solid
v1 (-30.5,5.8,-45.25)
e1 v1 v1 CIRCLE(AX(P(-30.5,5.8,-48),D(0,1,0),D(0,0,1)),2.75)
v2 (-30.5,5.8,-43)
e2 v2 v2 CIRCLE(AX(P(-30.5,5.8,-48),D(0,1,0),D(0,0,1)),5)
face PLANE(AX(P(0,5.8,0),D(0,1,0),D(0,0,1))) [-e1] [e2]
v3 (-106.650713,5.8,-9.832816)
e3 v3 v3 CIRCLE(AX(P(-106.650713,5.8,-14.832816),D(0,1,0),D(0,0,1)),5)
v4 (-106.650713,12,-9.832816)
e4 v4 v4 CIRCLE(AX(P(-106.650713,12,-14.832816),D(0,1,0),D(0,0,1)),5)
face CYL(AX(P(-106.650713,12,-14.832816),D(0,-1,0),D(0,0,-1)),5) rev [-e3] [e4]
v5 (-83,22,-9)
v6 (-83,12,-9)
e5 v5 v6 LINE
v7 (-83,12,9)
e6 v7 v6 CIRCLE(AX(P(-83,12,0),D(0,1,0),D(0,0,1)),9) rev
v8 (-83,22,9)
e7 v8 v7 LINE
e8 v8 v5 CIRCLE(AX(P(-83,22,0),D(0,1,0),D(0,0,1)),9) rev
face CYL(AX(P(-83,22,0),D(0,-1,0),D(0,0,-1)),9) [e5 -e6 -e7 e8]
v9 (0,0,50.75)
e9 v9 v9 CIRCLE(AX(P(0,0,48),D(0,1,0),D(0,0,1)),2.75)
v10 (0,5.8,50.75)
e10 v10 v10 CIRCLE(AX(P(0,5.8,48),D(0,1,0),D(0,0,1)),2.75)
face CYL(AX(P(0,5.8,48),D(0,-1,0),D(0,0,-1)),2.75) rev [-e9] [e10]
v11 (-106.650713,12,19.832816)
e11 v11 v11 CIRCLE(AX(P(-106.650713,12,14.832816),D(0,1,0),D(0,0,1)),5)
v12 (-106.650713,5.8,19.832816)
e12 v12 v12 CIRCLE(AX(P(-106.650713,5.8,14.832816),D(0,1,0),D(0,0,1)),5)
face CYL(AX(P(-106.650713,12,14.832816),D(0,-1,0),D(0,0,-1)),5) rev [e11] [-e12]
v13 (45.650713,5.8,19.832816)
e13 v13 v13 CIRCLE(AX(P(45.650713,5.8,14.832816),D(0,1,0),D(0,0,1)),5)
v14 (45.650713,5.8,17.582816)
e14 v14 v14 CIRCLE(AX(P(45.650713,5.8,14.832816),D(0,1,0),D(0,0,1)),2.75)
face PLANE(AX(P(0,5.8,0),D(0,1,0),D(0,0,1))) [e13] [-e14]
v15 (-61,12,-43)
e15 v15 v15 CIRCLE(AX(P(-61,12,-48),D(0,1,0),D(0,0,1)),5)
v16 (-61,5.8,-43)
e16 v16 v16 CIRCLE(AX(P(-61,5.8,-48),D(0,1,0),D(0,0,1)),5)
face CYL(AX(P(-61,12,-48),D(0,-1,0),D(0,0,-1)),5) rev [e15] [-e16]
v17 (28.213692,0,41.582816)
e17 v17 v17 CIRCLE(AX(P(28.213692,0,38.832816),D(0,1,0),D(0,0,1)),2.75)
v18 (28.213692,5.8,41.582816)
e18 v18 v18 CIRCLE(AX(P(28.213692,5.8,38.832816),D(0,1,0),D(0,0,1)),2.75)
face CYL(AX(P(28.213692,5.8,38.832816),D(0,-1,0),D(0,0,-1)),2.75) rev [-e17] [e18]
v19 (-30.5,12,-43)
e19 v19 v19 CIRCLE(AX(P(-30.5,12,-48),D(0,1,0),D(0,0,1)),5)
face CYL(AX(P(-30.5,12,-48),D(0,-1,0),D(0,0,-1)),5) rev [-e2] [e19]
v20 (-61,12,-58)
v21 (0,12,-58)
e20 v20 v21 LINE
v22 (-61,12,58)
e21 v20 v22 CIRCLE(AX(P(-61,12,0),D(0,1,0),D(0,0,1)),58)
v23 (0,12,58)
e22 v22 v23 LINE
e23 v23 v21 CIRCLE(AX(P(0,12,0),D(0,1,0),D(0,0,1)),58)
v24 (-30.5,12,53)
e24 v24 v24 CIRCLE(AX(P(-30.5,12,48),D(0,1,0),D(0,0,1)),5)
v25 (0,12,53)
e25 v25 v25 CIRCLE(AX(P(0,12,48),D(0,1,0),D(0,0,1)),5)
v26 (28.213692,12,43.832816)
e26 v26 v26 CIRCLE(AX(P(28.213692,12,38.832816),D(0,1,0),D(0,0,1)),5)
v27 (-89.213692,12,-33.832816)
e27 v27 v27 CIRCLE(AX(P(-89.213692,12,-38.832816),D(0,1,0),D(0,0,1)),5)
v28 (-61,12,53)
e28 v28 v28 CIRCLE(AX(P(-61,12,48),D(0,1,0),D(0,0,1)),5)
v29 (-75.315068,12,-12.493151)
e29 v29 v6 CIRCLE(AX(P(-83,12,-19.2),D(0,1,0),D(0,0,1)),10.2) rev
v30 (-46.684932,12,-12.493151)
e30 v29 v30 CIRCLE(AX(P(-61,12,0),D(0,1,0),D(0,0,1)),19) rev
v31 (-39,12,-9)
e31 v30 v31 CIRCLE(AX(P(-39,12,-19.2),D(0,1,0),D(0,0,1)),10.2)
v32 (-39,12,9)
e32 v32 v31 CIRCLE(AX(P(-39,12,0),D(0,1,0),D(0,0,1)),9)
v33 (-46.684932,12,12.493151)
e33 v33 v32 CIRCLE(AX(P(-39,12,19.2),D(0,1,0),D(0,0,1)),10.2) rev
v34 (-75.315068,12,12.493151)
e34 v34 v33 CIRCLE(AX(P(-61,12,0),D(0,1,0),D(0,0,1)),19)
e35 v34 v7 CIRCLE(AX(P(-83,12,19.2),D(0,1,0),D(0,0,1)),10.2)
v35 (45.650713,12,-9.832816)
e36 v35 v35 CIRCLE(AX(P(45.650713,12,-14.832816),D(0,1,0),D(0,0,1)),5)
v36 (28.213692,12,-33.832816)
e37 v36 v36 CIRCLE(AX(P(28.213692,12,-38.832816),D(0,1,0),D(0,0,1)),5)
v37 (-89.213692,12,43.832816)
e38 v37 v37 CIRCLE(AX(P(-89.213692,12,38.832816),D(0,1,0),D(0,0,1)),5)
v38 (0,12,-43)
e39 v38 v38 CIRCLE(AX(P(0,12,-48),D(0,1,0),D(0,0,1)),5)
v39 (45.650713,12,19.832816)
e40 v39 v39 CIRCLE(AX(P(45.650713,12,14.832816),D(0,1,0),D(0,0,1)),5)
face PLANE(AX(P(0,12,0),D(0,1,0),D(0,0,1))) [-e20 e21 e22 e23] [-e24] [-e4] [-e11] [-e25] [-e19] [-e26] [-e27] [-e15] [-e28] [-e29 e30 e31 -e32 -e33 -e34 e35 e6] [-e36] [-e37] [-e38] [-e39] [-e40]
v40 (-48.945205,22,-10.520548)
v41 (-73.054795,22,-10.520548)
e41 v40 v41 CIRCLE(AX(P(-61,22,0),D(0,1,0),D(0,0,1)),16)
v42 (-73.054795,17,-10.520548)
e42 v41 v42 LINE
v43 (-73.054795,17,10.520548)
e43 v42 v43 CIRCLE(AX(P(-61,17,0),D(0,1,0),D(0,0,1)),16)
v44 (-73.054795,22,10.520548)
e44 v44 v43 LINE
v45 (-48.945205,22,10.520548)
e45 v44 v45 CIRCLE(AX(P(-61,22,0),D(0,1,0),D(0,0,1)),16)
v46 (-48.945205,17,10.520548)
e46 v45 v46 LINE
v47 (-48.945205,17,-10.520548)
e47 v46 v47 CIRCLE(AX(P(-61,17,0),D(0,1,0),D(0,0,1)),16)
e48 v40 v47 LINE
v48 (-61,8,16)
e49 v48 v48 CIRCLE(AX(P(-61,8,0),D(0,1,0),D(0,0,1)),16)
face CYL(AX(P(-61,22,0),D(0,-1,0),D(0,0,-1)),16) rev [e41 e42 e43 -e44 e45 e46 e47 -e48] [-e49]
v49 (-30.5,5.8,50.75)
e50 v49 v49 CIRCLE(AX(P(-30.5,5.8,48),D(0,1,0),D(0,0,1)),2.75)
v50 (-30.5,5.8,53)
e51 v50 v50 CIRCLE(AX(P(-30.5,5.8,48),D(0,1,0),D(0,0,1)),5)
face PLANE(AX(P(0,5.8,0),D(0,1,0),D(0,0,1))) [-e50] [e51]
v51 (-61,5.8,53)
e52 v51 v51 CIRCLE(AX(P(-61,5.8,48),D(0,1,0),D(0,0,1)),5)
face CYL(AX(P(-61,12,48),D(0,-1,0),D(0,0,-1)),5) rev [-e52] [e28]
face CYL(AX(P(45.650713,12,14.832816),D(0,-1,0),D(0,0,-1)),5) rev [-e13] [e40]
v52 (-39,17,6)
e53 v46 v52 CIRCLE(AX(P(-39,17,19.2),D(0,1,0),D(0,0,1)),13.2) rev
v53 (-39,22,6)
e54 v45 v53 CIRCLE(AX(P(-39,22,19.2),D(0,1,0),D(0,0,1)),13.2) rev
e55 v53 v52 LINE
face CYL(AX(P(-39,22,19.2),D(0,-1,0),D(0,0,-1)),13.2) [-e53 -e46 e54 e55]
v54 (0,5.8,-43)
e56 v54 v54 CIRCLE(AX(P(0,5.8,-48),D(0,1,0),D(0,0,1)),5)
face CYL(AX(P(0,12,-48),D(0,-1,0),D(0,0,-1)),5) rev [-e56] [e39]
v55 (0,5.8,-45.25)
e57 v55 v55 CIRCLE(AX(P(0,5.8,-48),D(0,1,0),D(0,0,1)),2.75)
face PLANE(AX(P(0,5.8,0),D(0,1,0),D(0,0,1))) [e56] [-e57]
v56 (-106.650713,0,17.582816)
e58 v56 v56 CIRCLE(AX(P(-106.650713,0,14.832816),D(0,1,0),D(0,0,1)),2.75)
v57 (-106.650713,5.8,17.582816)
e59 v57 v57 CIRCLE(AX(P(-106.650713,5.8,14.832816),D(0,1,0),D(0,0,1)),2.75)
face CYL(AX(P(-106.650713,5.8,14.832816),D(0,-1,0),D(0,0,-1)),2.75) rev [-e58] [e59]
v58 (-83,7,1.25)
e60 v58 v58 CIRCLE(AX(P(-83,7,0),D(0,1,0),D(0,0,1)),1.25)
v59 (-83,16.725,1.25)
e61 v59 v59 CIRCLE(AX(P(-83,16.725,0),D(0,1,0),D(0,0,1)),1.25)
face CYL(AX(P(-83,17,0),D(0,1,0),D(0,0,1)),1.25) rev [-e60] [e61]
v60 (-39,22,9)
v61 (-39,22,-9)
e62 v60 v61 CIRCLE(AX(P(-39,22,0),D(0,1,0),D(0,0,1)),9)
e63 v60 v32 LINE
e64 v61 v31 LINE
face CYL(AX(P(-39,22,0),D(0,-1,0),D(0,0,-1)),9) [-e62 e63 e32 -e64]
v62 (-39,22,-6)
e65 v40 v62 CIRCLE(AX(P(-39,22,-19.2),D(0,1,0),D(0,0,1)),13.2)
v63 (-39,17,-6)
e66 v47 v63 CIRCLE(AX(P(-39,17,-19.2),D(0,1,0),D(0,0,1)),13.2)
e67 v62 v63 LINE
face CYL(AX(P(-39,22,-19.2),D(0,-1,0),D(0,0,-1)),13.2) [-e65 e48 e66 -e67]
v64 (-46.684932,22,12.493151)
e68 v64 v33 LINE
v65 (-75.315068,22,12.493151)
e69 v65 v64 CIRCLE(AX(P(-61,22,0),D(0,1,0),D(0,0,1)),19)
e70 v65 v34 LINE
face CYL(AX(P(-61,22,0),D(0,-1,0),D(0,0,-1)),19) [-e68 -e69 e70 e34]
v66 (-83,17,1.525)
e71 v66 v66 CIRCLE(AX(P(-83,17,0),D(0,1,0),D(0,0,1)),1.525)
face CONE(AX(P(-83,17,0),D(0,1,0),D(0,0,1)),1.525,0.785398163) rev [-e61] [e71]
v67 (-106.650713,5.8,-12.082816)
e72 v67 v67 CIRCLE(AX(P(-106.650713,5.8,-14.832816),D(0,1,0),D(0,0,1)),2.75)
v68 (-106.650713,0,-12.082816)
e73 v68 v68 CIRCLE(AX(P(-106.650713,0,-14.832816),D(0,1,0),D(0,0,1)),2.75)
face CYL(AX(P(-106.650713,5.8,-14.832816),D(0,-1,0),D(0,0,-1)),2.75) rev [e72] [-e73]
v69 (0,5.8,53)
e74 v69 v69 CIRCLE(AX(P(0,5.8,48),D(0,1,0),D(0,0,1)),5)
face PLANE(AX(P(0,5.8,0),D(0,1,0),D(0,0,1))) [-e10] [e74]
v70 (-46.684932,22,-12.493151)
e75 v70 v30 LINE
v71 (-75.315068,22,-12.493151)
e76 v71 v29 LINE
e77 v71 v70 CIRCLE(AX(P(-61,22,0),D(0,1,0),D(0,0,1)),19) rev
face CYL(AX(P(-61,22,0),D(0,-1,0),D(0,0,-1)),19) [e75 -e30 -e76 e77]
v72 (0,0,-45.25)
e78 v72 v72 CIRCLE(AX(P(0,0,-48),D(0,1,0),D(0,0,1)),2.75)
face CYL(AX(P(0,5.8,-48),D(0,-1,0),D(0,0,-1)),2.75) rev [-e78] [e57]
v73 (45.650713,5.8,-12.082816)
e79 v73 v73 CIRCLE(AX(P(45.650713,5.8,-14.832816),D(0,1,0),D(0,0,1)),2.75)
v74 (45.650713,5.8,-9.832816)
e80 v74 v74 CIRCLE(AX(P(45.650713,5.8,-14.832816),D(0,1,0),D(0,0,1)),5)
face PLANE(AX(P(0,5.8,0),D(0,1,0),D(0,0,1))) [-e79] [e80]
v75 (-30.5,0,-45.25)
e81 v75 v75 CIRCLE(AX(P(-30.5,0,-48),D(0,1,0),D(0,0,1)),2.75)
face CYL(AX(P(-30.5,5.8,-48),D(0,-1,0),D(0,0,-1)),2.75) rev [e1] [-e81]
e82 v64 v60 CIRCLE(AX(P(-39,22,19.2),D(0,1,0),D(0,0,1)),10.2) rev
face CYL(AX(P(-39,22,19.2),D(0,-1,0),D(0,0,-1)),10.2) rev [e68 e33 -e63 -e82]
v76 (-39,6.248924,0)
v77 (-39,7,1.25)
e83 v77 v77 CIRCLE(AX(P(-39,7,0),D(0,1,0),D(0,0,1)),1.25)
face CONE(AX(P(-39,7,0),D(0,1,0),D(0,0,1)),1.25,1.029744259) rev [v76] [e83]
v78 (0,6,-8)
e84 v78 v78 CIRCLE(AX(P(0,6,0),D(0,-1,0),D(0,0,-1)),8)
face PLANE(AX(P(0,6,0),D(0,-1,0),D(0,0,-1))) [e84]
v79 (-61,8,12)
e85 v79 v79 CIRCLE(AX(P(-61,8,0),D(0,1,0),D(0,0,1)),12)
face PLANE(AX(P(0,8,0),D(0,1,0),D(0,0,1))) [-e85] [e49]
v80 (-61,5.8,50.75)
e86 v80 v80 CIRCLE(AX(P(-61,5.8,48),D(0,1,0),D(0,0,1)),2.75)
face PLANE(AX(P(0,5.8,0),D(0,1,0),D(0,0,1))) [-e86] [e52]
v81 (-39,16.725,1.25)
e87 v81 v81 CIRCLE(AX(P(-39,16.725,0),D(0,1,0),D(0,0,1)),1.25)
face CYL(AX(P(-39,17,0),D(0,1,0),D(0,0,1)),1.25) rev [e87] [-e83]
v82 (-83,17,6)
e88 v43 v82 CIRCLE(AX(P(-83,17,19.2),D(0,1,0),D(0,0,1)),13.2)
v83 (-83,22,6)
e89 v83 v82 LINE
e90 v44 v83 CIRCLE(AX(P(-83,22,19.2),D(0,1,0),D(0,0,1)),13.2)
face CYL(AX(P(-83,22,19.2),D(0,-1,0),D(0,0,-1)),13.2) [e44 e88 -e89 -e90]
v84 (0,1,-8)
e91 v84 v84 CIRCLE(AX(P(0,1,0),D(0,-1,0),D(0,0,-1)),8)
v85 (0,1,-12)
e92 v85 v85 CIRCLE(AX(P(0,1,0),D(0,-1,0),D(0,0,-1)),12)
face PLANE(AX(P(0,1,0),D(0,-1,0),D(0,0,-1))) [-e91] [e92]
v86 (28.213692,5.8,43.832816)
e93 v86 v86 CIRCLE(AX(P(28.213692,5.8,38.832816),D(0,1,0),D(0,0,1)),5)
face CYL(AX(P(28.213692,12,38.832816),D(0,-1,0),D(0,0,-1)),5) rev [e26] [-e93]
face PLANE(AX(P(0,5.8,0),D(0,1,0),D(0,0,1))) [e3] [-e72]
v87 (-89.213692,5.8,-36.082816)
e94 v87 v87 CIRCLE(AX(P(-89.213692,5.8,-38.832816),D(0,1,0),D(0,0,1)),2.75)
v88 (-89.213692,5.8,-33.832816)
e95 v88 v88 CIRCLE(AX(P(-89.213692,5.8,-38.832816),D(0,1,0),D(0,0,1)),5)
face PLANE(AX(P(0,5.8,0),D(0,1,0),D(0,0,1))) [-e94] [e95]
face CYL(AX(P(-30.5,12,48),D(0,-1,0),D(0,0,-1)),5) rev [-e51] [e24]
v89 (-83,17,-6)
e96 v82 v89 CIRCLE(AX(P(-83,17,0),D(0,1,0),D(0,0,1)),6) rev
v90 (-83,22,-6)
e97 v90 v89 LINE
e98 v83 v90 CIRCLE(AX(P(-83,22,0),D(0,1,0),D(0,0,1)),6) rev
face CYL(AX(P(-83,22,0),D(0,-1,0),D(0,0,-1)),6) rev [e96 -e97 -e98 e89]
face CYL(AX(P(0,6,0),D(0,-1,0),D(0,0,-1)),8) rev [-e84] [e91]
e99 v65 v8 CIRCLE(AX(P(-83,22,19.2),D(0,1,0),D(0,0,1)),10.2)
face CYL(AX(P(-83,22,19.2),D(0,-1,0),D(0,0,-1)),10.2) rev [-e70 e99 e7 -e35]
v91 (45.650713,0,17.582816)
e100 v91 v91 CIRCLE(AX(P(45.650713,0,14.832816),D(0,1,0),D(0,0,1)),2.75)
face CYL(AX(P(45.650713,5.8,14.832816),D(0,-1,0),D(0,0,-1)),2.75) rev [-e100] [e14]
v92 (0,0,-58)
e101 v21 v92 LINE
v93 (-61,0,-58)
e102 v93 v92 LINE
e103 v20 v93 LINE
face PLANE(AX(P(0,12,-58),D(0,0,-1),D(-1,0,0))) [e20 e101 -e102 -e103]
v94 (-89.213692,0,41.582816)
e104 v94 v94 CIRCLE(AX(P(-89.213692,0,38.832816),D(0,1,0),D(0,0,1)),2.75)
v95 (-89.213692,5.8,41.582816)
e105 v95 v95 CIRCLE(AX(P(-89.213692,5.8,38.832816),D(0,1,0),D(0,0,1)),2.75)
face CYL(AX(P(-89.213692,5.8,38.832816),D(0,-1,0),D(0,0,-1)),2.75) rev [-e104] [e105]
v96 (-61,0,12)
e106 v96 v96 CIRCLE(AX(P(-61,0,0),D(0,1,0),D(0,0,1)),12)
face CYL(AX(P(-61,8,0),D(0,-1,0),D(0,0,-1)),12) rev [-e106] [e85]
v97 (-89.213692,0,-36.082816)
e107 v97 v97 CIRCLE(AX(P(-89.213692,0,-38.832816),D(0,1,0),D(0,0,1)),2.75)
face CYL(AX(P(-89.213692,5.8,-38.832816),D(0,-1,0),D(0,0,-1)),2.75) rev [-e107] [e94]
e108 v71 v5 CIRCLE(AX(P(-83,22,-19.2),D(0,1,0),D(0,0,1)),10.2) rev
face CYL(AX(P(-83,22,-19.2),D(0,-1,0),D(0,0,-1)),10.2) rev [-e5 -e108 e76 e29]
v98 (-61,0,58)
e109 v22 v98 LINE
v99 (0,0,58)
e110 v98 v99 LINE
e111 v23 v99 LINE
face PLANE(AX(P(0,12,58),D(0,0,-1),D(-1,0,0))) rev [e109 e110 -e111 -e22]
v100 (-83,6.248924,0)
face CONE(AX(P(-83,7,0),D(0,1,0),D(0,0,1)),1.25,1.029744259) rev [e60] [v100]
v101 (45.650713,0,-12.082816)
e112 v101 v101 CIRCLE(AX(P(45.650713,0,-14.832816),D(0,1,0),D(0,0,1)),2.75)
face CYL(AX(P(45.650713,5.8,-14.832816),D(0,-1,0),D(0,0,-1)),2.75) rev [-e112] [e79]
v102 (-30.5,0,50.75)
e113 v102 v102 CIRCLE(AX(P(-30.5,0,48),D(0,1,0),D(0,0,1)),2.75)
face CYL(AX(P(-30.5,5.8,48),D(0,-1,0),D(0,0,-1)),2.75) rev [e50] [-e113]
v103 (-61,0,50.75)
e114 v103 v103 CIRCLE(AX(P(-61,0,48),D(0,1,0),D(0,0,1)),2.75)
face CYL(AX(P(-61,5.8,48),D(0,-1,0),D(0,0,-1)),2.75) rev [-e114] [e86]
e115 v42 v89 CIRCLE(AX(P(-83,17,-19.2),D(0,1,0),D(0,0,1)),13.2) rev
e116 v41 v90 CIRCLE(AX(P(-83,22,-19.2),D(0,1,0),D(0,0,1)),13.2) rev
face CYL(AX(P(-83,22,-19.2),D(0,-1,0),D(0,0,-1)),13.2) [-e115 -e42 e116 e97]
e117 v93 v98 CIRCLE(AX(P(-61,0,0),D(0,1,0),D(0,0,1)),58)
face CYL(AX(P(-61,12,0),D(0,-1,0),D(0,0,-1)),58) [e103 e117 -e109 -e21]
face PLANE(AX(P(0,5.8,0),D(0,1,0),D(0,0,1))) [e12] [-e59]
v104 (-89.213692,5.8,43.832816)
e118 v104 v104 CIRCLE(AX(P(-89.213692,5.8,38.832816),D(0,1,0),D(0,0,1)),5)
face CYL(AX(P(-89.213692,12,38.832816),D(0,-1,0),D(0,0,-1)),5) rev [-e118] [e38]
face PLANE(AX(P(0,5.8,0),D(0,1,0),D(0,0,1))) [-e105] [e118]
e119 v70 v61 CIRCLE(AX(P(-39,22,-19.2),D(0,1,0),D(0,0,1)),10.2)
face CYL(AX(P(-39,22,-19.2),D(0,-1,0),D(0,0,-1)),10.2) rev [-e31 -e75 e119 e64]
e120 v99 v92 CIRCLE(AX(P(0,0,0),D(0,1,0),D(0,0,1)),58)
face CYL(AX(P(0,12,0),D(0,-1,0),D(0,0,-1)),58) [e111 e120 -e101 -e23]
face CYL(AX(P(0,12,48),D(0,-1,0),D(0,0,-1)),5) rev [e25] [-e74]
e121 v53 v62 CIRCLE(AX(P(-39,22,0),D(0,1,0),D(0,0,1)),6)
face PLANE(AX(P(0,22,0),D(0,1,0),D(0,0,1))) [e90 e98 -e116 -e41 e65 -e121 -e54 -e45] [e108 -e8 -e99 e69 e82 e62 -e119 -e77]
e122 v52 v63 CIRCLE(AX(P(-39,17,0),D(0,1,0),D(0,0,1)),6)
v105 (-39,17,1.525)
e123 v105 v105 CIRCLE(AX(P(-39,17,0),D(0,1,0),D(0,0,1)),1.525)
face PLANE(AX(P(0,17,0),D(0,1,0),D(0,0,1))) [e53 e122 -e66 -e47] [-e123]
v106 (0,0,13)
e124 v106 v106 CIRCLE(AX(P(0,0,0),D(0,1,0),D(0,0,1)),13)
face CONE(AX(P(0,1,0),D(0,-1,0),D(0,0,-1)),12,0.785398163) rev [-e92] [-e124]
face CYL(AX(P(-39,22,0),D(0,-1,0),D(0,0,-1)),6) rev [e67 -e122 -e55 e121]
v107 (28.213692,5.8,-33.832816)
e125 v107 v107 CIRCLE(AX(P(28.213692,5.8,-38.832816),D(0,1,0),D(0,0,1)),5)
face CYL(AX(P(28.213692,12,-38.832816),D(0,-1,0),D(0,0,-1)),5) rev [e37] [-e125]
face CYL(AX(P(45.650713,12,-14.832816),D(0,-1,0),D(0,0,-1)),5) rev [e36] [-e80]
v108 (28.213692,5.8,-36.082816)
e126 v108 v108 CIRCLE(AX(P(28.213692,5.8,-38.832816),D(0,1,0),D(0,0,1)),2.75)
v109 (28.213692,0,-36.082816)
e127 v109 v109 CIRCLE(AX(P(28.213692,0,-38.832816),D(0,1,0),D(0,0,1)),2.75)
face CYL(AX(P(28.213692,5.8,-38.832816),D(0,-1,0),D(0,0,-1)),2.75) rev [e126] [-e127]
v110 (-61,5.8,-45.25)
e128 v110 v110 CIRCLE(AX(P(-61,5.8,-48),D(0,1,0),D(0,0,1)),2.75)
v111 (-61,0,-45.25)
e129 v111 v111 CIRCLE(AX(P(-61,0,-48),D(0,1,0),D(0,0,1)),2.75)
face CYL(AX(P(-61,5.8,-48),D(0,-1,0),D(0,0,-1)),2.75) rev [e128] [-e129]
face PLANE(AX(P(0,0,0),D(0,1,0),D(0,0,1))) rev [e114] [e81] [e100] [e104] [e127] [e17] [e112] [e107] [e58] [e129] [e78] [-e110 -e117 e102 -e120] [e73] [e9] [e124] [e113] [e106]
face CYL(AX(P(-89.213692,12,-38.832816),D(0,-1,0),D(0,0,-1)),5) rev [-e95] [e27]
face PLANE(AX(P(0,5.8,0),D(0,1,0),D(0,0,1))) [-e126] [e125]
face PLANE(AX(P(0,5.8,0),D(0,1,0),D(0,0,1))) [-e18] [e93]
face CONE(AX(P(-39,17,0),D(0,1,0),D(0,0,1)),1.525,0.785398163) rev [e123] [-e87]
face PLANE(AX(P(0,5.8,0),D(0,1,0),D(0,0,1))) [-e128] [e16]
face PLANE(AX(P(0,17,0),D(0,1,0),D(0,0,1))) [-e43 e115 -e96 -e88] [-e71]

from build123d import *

# Parameters (mm, degrees)
SKETCH2_R                   = 5
BOSS_EXTRUDE4_DEPTH         = 12
SKETCH2_6_R                 = 16
SKETCH2_6_R_2               = 12
BOSS_EXTRUDE5_DEPTH         = 8
SKETCH2_7_R                 = 1.25
BOSS_EXTRUDE6_DEPTH         = 17
BOSS_EXTRUDE7_DEPTH         = 22
SKETCH2_10_R                = 1.25
BOSS_EXTRUDE9_DEPTH         = 17
M3_TAPPED_HOLE2_D           = 2.5
M3_TAPPED_HOLE2_DEPTH       = 10
M3_TAPPED_HOLE2_CSINK_D     = 3.05
M3_TAPPED_HOLE2_CSINK_ANGLE = 90
M3_TAPPED_HOLE2_TIP         = 0.751075774
SKETCH11_R                  = 12
CUT_EXTRUDE1_DEPTH          = 1
SKETCH12_R                  = 8
CUT_EXTRUDE2_DEPTH          = 6
CHAMFER1_SIZE               = 1
SKETCH2_12_R                = 5
SKETCH2_12_R_2              = 2.75
BOSS_EXTRUDE10_DEPTH        = 5.8


with BuildPart() as part:
    # Sketch2 → Boss-Extrude4 (new body)
    with BuildSketch(Plane(origin=(0, 0, 0), x_dir=(1, 0, 0), z_dir=(0, 1, 0))):
        with BuildLine():
            Line((-61, -58), (0, -58))
            ThreePointArc((0, -58), (58, 0), (0, 58))
            Line((0, 58), (-61, 58))
            ThreePointArc((-61, 58), (-119, 0), (-61, -58))
        make_face()
        with Locations(Location((0, 48, 0), (0, 0, 270))):
            Circle(SKETCH2_R, mode=Mode.SUBTRACT)
        with Locations(Location((-30.5, 48, 0), (0, 0, 270))):
            Circle(SKETCH2_R, mode=Mode.SUBTRACT)
        with Locations(Location((-61, 48, 0), (0, 0, 270))):
            Circle(SKETCH2_R, mode=Mode.SUBTRACT)
        with Locations(Location((-89.21369211, 38.83281573, 0), (0, 0, 270))):
            Circle(SKETCH2_R, mode=Mode.SUBTRACT)
        with Locations(Location((-106.650712782, 14.83281573, 0), (0, 0, 270))):
            Circle(SKETCH2_R, mode=Mode.SUBTRACT)
        with Locations(Location((-106.650712782, -14.83281573, 0), (0, 0, 270))):
            Circle(SKETCH2_R, mode=Mode.SUBTRACT)
        with Locations(Location((-89.21369211, -38.83281573, 0), (0, 0, 270))):
            Circle(SKETCH2_R, mode=Mode.SUBTRACT)
        with Locations(Location((-61, -48, 0), (0, 0, 270))):
            Circle(SKETCH2_R, mode=Mode.SUBTRACT)
        with Locations(Location((-30.5, -48, 0), (0, 0, 270))):
            Circle(SKETCH2_R, mode=Mode.SUBTRACT)
        with Locations(Location((0, -48, 0), (0, 0, 270))):
            Circle(SKETCH2_R, mode=Mode.SUBTRACT)
        with Locations(Location((28.21369211, -38.83281573, 0), (0, 0, 270))):
            Circle(SKETCH2_R, mode=Mode.SUBTRACT)
        with Locations(Location((45.650712782, -14.83281573, 0), (0, 0, 270))):
            Circle(SKETCH2_R, mode=Mode.SUBTRACT)
        with Locations(Location((45.650712782, 14.83281573, 0), (0, 0, 270))):
            Circle(SKETCH2_R, mode=Mode.SUBTRACT)
        with Locations(Location((28.21369211, 38.83281573, 0), (0, 0, 270))):
            Circle(SKETCH2_R, mode=Mode.SUBTRACT)
        with BuildLine():
            ThreePointArc((-75.315068493, -12.493150685), (-61, -19), (-46.684931507, -12.493150685))
            ThreePointArc((-46.684931507, -12.493150685), (-43.220790032, -9.91426193), (-39, -9))
            ThreePointArc((-39, -9), (-30, 0), (-39, 9))
            ThreePointArc((-39, 9), (-43.220790032, 9.91426193), (-46.684931507, 12.493150685))
            ThreePointArc((-46.684931507, 12.493150685), (-61, 19), (-75.315068493, 12.493150685))
            ThreePointArc((-75.315068493, 12.493150685), (-78.779209968, 9.91426193), (-83, 9))
            ThreePointArc((-83, 9), (-92, 0), (-83, -9))
            ThreePointArc((-83, -9), (-78.779209968, -9.91426193), (-75.315068493, -12.493150685))
        make_face(mode=Mode.SUBTRACT)
    extrude(amount=BOSS_EXTRUDE4_DEPTH)



with BuildPart() as body_2:
    # Sketch2<6> → Boss-Extrude5 (new body)
    with BuildSketch(Plane(origin=(0, 0, 0), x_dir=(1, 0, 0), z_dir=(0, 1, 0))):
        with Locations(Location((-61, 0, 0), (0, 0, 270))):
            Circle(SKETCH2_6_R)
        with Locations(Location((-61, 0, 0), (0, 0, 270))):
            Circle(SKETCH2_6_R_2, mode=Mode.SUBTRACT)
    extrude(amount=BOSS_EXTRUDE5_DEPTH)

    # Sketch2<7> → Boss-Extrude6 (add)
    # profile 1 of 2: a face of its own
    with BuildSketch(Plane(origin=(0, 0, 0), x_dir=(1, 0, 0), z_dir=(0, 1, 0))):
        with BuildLine():
            ThreePointArc((-48.945205479, 10.520547945), (-46.018733159, 5.617975065), (-45, 0))
            ThreePointArc((-45, 0), (-46.018733159, -5.617975065), (-48.945205479, -10.520547945))
            ThreePointArc((-48.945205479, -10.520547945), (-44.462198865, -7.183162497), (-39, -6))
            ThreePointArc((-39, -6), (-33, 0), (-39, 6))
            ThreePointArc((-39, 6), (-44.462198865, 7.183162497), (-48.945205479, 10.520547945))
        make_face()
        with Locations(Location((-39, 0, 0), (0, 0, 270))):
            Circle(SKETCH2_7_R, mode=Mode.SUBTRACT)
    # profile 2 of 2: a face of its own
    with BuildSketch(Plane(origin=(0, 0, 0), x_dir=(1, 0, 0), z_dir=(0, 1, 0))):
        with BuildLine():
            ThreePointArc((-73.054794521, -10.520547945), (-77, 0), (-73.054794521, 10.520547945))
            ThreePointArc((-73.054794521, 10.520547945), (-77.537801135, 7.183162497), (-83, 6))
            ThreePointArc((-83, 6), (-89, 0), (-83, -6))
            ThreePointArc((-83, -6), (-77.537801135, -7.183162497), (-73.054794521, -10.520547945))
        make_face()
        with Locations(Location((-83, 0, 0), (0, 0, 270))):
            Circle(SKETCH2_7_R, mode=Mode.SUBTRACT)
    extrude(amount=BOSS_EXTRUDE6_DEPTH)


with BuildPart() as part_1:
    add(part.part)

    add(body_2.part)  # Boss-Extrude7 merges body 2
    # Sketch2<8> → Boss-Extrude7 (add)
    with BuildSketch(Plane(origin=(0, 0, 0), x_dir=(1, 0, 0), z_dir=(0, 1, 0))):
        with BuildLine():
            ThreePointArc((-46.684931507, -12.493150685), (-43.220790032, -9.91426193), (-39, -9))
            ThreePointArc((-39, -9), (-30, 0), (-39, 9))
            ThreePointArc((-39, 9), (-43.220790032, 9.91426193), (-46.684931507, 12.493150685))
            ThreePointArc((-46.684931507, 12.493150685), (-61, 19), (-75.315068493, 12.493150685))
            ThreePointArc((-75.315068493, 12.493150685), (-78.779209968, 9.91426193), (-83, 9))
            ThreePointArc((-83, 9), (-92, 0), (-83, -9))
            ThreePointArc((-83, -9), (-78.779209968, -9.91426193), (-75.315068493, -12.493150685))
            ThreePointArc((-75.315068493, -12.493150685), (-61, -19), (-46.684931507, -12.493150685))
        make_face()
        with BuildLine():
            ThreePointArc((-48.945205479, 10.520547945), (-44.462198865, 7.183162497), (-39, 6))
            ThreePointArc((-39, 6), (-33, 0), (-39, -6))
            ThreePointArc((-39, -6), (-44.462198865, -7.183162497), (-48.945205479, -10.520547945))
            ThreePointArc((-48.945205479, -10.520547945), (-61, -16), (-73.054794521, -10.520547945))
            ThreePointArc((-73.054794521, -10.520547945), (-77.537801135, -7.183162497), (-83, -6))
            ThreePointArc((-83, -6), (-89, 0), (-83, 6))
            ThreePointArc((-83, 6), (-77.537801135, 7.183162497), (-73.054794521, 10.520547945))
            ThreePointArc((-73.054794521, 10.520547945), (-61, 16), (-48.945205479, 10.520547945))
        make_face(mode=Mode.SUBTRACT)
    extrude(amount=BOSS_EXTRUDE7_DEPTH)

    # Sketch2<10> → Boss-Extrude9 (add)
    with BuildSketch(Plane(origin=(0, 0, 0), x_dir=(1, 0, 0), z_dir=(0, 1, 0))):
        with Locations((-39, 0)):
            Circle(SKETCH2_10_R)
        with Locations((-83, 0)):
            Circle(SKETCH2_10_R)
    extrude(amount=BOSS_EXTRUDE9_DEPTH)

    # M3 Tapped Hole2
    with Locations(Plane(origin=(0, 17, 0), x_dir=(1, 0, 0), z_dir=(0, 1, 0))):
        with Locations((-39, 0), (-83, 0)):
            CounterSinkHole(M3_TAPPED_HOLE2_D / 2, M3_TAPPED_HOLE2_CSINK_D / 2, depth=M3_TAPPED_HOLE2_DEPTH, counter_sink_angle=M3_TAPPED_HOLE2_CSINK_ANGLE)
            with Locations((0, 0, -(M3_TAPPED_HOLE2_DEPTH + M3_TAPPED_HOLE2_TIP / 2))):  # 118° drill point
                Cone(0, M3_TAPPED_HOLE2_D / 2, M3_TAPPED_HOLE2_TIP, mode=Mode.SUBTRACT)

    # Sketch11 → Cut-Extrude1 (cut)
    with BuildSketch(Plane.XZ):
        with Locations(Location((0, 0, 0), (0, 0, 270))):
            Circle(SKETCH11_R)
    extrude(amount=-CUT_EXTRUDE1_DEPTH, mode=Mode.SUBTRACT)

    # Sketch12 → Cut-Extrude2 (cut)
    with BuildSketch(Plane.XZ):
        with Locations(Location((0, 0, 0), (0, 0, 270))):
            Circle(SKETCH12_R)
    extrude(amount=-CUT_EXTRUDE2_DEPTH, mode=Mode.SUBTRACT)

    # Chamfer1
    chamfer1_edges = [part_1.edges().sort_by_distance(p)[0] for p in [
        (0, 0, 12),
    ]]
    chamfer(chamfer1_edges, length=CHAMFER1_SIZE - 0.0001)  # a hair under: the kernel refuses the full size

    # Sketch2<12> → Boss-Extrude10 (add)
    # profile 1 of 14: a face of its own
    with BuildSketch(Plane(origin=(0, 0, 0), x_dir=(1, 0, 0), z_dir=(0, 1, 0))):
        with Locations(Location((0, -48, 0), (0, 0, 270))):
            Circle(SKETCH2_12_R)
        with Locations(Location((0, -48, 0), (0, 0, 270))):
            Circle(SKETCH2_12_R_2, mode=Mode.SUBTRACT)
    # profile 2 of 14: a face of its own
    with BuildSketch(Plane(origin=(0, 0, 0), x_dir=(1, 0, 0), z_dir=(0, 1, 0))):
        with Locations(Location((28.21369211, -38.83281573, 0), (0, 0, 270))):
            Circle(SKETCH2_12_R)
        with Locations(Location((28.21369211, -38.83281573, 0), (0, 0, 270))):
            Circle(SKETCH2_12_R_2, mode=Mode.SUBTRACT)
    # profile 3 of 14: a face of its own
    with BuildSketch(Plane(origin=(0, 0, 0), x_dir=(1, 0, 0), z_dir=(0, 1, 0))):
        with Locations(Location((45.650712782, -14.83281573, 0), (0, 0, 270))):
            Circle(SKETCH2_12_R)
        with Locations(Location((45.650712782, -14.83281573, 0), (0, 0, 270))):
            Circle(SKETCH2_12_R_2, mode=Mode.SUBTRACT)
    # profile 4 of 14: a face of its own
    with BuildSketch(Plane(origin=(0, 0, 0), x_dir=(1, 0, 0), z_dir=(0, 1, 0))):
        with Locations(Location((45.650712782, 14.83281573, 0), (0, 0, 270))):
            Circle(SKETCH2_12_R)
        with Locations(Location((45.650712782, 14.83281573, 0), (0, 0, 270))):
            Circle(SKETCH2_12_R_2, mode=Mode.SUBTRACT)
    # profile 5 of 14: a face of its own
    with BuildSketch(Plane(origin=(0, 0, 0), x_dir=(1, 0, 0), z_dir=(0, 1, 0))):
        with Locations(Location((28.21369211, 38.83281573, 0), (0, 0, 270))):
            Circle(SKETCH2_12_R)
        with Locations(Location((28.21369211, 38.83281573, 0), (0, 0, 270))):
            Circle(SKETCH2_12_R_2, mode=Mode.SUBTRACT)
    # profile 6 of 14: a face of its own
    with BuildSketch(Plane(origin=(0, 0, 0), x_dir=(1, 0, 0), z_dir=(0, 1, 0))):
        with Locations(Location((0, 48, 0), (0, 0, 270))):
            Circle(SKETCH2_12_R)
        with Locations(Location((0, 48, 0), (0, 0, 270))):
            Circle(SKETCH2_12_R_2, mode=Mode.SUBTRACT)
    # profile 7 of 14: a face of its own
    with BuildSketch(Plane(origin=(0, 0, 0), x_dir=(1, 0, 0), z_dir=(0, 1, 0))):
        with Locations(Location((-30.5, 48, 0), (0, 0, 270))):
            Circle(SKETCH2_12_R)
        with Locations(Location((-30.5, 48, 0), (0, 0, 270))):
            Circle(SKETCH2_12_R_2, mode=Mode.SUBTRACT)
    # profile 8 of 14: a face of its own
    with BuildSketch(Plane(origin=(0, 0, 0), x_dir=(1, 0, 0), z_dir=(0, 1, 0))):
        with Locations(Location((-61, 48, 0), (0, 0, 270))):
            Circle(SKETCH2_12_R)
        with Locations(Location((-61, 48, 0), (0, 0, 270))):
            Circle(SKETCH2_12_R_2, mode=Mode.SUBTRACT)
    # profile 9 of 14: a face of its own
    with BuildSketch(Plane(origin=(0, 0, 0), x_dir=(1, 0, 0), z_dir=(0, 1, 0))):
        with Locations(Location((-89.21369211, 38.83281573, 0), (0, 0, 270))):
            Circle(SKETCH2_12_R)
        with Locations(Location((-89.21369211, 38.83281573, 0), (0, 0, 270))):
            Circle(SKETCH2_12_R_2, mode=Mode.SUBTRACT)
    # profile 10 of 14: a face of its own
    with BuildSketch(Plane(origin=(0, 0, 0), x_dir=(1, 0, 0), z_dir=(0, 1, 0))):
        with Locations(Location((-106.650712782, 14.83281573, 0), (0, 0, 270))):
            Circle(SKETCH2_12_R)
        with Locations(Location((-106.650712782, 14.83281573, 0), (0, 0, 270))):
            Circle(SKETCH2_12_R_2, mode=Mode.SUBTRACT)
    # profile 11 of 14: a face of its own
    with BuildSketch(Plane(origin=(0, 0, 0), x_dir=(1, 0, 0), z_dir=(0, 1, 0))):
        with Locations(Location((-106.650712782, -14.83281573, 0), (0, 0, 270))):
            Circle(SKETCH2_12_R)
        with Locations(Location((-106.650712782, -14.83281573, 0), (0, 0, 270))):
            Circle(SKETCH2_12_R_2, mode=Mode.SUBTRACT)
    # profile 12 of 14: a face of its own
    with BuildSketch(Plane(origin=(0, 0, 0), x_dir=(1, 0, 0), z_dir=(0, 1, 0))):
        with Locations(Location((-89.21369211, -38.83281573, 0), (0, 0, 270))):
            Circle(SKETCH2_12_R)
        with Locations(Location((-89.21369211, -38.83281573, 0), (0, 0, 270))):
            Circle(SKETCH2_12_R_2, mode=Mode.SUBTRACT)
    # profile 13 of 14: a face of its own
    with BuildSketch(Plane(origin=(0, 0, 0), x_dir=(1, 0, 0), z_dir=(0, 1, 0))):
        with Locations(Location((-61, -48, 0), (0, 0, 270))):
            Circle(SKETCH2_12_R)
        with Locations(Location((-61, -48, 0), (0, 0, 270))):
            Circle(SKETCH2_12_R_2, mode=Mode.SUBTRACT)
    # profile 14 of 14: a face of its own
    with BuildSketch(Plane(origin=(0, 0, 0), x_dir=(1, 0, 0), z_dir=(0, 1, 0))):
        with Locations(Location((-30.5, -48, 0), (0, 0, 270))):
            Circle(SKETCH2_12_R)
        with Locations(Location((-30.5, -48, 0), (0, 0, 270))):
            Circle(SKETCH2_12_R_2, mode=Mode.SUBTRACT)
    extrude(amount=BOSS_EXTRUDE10_DEPTH)


solid = part_1.part
